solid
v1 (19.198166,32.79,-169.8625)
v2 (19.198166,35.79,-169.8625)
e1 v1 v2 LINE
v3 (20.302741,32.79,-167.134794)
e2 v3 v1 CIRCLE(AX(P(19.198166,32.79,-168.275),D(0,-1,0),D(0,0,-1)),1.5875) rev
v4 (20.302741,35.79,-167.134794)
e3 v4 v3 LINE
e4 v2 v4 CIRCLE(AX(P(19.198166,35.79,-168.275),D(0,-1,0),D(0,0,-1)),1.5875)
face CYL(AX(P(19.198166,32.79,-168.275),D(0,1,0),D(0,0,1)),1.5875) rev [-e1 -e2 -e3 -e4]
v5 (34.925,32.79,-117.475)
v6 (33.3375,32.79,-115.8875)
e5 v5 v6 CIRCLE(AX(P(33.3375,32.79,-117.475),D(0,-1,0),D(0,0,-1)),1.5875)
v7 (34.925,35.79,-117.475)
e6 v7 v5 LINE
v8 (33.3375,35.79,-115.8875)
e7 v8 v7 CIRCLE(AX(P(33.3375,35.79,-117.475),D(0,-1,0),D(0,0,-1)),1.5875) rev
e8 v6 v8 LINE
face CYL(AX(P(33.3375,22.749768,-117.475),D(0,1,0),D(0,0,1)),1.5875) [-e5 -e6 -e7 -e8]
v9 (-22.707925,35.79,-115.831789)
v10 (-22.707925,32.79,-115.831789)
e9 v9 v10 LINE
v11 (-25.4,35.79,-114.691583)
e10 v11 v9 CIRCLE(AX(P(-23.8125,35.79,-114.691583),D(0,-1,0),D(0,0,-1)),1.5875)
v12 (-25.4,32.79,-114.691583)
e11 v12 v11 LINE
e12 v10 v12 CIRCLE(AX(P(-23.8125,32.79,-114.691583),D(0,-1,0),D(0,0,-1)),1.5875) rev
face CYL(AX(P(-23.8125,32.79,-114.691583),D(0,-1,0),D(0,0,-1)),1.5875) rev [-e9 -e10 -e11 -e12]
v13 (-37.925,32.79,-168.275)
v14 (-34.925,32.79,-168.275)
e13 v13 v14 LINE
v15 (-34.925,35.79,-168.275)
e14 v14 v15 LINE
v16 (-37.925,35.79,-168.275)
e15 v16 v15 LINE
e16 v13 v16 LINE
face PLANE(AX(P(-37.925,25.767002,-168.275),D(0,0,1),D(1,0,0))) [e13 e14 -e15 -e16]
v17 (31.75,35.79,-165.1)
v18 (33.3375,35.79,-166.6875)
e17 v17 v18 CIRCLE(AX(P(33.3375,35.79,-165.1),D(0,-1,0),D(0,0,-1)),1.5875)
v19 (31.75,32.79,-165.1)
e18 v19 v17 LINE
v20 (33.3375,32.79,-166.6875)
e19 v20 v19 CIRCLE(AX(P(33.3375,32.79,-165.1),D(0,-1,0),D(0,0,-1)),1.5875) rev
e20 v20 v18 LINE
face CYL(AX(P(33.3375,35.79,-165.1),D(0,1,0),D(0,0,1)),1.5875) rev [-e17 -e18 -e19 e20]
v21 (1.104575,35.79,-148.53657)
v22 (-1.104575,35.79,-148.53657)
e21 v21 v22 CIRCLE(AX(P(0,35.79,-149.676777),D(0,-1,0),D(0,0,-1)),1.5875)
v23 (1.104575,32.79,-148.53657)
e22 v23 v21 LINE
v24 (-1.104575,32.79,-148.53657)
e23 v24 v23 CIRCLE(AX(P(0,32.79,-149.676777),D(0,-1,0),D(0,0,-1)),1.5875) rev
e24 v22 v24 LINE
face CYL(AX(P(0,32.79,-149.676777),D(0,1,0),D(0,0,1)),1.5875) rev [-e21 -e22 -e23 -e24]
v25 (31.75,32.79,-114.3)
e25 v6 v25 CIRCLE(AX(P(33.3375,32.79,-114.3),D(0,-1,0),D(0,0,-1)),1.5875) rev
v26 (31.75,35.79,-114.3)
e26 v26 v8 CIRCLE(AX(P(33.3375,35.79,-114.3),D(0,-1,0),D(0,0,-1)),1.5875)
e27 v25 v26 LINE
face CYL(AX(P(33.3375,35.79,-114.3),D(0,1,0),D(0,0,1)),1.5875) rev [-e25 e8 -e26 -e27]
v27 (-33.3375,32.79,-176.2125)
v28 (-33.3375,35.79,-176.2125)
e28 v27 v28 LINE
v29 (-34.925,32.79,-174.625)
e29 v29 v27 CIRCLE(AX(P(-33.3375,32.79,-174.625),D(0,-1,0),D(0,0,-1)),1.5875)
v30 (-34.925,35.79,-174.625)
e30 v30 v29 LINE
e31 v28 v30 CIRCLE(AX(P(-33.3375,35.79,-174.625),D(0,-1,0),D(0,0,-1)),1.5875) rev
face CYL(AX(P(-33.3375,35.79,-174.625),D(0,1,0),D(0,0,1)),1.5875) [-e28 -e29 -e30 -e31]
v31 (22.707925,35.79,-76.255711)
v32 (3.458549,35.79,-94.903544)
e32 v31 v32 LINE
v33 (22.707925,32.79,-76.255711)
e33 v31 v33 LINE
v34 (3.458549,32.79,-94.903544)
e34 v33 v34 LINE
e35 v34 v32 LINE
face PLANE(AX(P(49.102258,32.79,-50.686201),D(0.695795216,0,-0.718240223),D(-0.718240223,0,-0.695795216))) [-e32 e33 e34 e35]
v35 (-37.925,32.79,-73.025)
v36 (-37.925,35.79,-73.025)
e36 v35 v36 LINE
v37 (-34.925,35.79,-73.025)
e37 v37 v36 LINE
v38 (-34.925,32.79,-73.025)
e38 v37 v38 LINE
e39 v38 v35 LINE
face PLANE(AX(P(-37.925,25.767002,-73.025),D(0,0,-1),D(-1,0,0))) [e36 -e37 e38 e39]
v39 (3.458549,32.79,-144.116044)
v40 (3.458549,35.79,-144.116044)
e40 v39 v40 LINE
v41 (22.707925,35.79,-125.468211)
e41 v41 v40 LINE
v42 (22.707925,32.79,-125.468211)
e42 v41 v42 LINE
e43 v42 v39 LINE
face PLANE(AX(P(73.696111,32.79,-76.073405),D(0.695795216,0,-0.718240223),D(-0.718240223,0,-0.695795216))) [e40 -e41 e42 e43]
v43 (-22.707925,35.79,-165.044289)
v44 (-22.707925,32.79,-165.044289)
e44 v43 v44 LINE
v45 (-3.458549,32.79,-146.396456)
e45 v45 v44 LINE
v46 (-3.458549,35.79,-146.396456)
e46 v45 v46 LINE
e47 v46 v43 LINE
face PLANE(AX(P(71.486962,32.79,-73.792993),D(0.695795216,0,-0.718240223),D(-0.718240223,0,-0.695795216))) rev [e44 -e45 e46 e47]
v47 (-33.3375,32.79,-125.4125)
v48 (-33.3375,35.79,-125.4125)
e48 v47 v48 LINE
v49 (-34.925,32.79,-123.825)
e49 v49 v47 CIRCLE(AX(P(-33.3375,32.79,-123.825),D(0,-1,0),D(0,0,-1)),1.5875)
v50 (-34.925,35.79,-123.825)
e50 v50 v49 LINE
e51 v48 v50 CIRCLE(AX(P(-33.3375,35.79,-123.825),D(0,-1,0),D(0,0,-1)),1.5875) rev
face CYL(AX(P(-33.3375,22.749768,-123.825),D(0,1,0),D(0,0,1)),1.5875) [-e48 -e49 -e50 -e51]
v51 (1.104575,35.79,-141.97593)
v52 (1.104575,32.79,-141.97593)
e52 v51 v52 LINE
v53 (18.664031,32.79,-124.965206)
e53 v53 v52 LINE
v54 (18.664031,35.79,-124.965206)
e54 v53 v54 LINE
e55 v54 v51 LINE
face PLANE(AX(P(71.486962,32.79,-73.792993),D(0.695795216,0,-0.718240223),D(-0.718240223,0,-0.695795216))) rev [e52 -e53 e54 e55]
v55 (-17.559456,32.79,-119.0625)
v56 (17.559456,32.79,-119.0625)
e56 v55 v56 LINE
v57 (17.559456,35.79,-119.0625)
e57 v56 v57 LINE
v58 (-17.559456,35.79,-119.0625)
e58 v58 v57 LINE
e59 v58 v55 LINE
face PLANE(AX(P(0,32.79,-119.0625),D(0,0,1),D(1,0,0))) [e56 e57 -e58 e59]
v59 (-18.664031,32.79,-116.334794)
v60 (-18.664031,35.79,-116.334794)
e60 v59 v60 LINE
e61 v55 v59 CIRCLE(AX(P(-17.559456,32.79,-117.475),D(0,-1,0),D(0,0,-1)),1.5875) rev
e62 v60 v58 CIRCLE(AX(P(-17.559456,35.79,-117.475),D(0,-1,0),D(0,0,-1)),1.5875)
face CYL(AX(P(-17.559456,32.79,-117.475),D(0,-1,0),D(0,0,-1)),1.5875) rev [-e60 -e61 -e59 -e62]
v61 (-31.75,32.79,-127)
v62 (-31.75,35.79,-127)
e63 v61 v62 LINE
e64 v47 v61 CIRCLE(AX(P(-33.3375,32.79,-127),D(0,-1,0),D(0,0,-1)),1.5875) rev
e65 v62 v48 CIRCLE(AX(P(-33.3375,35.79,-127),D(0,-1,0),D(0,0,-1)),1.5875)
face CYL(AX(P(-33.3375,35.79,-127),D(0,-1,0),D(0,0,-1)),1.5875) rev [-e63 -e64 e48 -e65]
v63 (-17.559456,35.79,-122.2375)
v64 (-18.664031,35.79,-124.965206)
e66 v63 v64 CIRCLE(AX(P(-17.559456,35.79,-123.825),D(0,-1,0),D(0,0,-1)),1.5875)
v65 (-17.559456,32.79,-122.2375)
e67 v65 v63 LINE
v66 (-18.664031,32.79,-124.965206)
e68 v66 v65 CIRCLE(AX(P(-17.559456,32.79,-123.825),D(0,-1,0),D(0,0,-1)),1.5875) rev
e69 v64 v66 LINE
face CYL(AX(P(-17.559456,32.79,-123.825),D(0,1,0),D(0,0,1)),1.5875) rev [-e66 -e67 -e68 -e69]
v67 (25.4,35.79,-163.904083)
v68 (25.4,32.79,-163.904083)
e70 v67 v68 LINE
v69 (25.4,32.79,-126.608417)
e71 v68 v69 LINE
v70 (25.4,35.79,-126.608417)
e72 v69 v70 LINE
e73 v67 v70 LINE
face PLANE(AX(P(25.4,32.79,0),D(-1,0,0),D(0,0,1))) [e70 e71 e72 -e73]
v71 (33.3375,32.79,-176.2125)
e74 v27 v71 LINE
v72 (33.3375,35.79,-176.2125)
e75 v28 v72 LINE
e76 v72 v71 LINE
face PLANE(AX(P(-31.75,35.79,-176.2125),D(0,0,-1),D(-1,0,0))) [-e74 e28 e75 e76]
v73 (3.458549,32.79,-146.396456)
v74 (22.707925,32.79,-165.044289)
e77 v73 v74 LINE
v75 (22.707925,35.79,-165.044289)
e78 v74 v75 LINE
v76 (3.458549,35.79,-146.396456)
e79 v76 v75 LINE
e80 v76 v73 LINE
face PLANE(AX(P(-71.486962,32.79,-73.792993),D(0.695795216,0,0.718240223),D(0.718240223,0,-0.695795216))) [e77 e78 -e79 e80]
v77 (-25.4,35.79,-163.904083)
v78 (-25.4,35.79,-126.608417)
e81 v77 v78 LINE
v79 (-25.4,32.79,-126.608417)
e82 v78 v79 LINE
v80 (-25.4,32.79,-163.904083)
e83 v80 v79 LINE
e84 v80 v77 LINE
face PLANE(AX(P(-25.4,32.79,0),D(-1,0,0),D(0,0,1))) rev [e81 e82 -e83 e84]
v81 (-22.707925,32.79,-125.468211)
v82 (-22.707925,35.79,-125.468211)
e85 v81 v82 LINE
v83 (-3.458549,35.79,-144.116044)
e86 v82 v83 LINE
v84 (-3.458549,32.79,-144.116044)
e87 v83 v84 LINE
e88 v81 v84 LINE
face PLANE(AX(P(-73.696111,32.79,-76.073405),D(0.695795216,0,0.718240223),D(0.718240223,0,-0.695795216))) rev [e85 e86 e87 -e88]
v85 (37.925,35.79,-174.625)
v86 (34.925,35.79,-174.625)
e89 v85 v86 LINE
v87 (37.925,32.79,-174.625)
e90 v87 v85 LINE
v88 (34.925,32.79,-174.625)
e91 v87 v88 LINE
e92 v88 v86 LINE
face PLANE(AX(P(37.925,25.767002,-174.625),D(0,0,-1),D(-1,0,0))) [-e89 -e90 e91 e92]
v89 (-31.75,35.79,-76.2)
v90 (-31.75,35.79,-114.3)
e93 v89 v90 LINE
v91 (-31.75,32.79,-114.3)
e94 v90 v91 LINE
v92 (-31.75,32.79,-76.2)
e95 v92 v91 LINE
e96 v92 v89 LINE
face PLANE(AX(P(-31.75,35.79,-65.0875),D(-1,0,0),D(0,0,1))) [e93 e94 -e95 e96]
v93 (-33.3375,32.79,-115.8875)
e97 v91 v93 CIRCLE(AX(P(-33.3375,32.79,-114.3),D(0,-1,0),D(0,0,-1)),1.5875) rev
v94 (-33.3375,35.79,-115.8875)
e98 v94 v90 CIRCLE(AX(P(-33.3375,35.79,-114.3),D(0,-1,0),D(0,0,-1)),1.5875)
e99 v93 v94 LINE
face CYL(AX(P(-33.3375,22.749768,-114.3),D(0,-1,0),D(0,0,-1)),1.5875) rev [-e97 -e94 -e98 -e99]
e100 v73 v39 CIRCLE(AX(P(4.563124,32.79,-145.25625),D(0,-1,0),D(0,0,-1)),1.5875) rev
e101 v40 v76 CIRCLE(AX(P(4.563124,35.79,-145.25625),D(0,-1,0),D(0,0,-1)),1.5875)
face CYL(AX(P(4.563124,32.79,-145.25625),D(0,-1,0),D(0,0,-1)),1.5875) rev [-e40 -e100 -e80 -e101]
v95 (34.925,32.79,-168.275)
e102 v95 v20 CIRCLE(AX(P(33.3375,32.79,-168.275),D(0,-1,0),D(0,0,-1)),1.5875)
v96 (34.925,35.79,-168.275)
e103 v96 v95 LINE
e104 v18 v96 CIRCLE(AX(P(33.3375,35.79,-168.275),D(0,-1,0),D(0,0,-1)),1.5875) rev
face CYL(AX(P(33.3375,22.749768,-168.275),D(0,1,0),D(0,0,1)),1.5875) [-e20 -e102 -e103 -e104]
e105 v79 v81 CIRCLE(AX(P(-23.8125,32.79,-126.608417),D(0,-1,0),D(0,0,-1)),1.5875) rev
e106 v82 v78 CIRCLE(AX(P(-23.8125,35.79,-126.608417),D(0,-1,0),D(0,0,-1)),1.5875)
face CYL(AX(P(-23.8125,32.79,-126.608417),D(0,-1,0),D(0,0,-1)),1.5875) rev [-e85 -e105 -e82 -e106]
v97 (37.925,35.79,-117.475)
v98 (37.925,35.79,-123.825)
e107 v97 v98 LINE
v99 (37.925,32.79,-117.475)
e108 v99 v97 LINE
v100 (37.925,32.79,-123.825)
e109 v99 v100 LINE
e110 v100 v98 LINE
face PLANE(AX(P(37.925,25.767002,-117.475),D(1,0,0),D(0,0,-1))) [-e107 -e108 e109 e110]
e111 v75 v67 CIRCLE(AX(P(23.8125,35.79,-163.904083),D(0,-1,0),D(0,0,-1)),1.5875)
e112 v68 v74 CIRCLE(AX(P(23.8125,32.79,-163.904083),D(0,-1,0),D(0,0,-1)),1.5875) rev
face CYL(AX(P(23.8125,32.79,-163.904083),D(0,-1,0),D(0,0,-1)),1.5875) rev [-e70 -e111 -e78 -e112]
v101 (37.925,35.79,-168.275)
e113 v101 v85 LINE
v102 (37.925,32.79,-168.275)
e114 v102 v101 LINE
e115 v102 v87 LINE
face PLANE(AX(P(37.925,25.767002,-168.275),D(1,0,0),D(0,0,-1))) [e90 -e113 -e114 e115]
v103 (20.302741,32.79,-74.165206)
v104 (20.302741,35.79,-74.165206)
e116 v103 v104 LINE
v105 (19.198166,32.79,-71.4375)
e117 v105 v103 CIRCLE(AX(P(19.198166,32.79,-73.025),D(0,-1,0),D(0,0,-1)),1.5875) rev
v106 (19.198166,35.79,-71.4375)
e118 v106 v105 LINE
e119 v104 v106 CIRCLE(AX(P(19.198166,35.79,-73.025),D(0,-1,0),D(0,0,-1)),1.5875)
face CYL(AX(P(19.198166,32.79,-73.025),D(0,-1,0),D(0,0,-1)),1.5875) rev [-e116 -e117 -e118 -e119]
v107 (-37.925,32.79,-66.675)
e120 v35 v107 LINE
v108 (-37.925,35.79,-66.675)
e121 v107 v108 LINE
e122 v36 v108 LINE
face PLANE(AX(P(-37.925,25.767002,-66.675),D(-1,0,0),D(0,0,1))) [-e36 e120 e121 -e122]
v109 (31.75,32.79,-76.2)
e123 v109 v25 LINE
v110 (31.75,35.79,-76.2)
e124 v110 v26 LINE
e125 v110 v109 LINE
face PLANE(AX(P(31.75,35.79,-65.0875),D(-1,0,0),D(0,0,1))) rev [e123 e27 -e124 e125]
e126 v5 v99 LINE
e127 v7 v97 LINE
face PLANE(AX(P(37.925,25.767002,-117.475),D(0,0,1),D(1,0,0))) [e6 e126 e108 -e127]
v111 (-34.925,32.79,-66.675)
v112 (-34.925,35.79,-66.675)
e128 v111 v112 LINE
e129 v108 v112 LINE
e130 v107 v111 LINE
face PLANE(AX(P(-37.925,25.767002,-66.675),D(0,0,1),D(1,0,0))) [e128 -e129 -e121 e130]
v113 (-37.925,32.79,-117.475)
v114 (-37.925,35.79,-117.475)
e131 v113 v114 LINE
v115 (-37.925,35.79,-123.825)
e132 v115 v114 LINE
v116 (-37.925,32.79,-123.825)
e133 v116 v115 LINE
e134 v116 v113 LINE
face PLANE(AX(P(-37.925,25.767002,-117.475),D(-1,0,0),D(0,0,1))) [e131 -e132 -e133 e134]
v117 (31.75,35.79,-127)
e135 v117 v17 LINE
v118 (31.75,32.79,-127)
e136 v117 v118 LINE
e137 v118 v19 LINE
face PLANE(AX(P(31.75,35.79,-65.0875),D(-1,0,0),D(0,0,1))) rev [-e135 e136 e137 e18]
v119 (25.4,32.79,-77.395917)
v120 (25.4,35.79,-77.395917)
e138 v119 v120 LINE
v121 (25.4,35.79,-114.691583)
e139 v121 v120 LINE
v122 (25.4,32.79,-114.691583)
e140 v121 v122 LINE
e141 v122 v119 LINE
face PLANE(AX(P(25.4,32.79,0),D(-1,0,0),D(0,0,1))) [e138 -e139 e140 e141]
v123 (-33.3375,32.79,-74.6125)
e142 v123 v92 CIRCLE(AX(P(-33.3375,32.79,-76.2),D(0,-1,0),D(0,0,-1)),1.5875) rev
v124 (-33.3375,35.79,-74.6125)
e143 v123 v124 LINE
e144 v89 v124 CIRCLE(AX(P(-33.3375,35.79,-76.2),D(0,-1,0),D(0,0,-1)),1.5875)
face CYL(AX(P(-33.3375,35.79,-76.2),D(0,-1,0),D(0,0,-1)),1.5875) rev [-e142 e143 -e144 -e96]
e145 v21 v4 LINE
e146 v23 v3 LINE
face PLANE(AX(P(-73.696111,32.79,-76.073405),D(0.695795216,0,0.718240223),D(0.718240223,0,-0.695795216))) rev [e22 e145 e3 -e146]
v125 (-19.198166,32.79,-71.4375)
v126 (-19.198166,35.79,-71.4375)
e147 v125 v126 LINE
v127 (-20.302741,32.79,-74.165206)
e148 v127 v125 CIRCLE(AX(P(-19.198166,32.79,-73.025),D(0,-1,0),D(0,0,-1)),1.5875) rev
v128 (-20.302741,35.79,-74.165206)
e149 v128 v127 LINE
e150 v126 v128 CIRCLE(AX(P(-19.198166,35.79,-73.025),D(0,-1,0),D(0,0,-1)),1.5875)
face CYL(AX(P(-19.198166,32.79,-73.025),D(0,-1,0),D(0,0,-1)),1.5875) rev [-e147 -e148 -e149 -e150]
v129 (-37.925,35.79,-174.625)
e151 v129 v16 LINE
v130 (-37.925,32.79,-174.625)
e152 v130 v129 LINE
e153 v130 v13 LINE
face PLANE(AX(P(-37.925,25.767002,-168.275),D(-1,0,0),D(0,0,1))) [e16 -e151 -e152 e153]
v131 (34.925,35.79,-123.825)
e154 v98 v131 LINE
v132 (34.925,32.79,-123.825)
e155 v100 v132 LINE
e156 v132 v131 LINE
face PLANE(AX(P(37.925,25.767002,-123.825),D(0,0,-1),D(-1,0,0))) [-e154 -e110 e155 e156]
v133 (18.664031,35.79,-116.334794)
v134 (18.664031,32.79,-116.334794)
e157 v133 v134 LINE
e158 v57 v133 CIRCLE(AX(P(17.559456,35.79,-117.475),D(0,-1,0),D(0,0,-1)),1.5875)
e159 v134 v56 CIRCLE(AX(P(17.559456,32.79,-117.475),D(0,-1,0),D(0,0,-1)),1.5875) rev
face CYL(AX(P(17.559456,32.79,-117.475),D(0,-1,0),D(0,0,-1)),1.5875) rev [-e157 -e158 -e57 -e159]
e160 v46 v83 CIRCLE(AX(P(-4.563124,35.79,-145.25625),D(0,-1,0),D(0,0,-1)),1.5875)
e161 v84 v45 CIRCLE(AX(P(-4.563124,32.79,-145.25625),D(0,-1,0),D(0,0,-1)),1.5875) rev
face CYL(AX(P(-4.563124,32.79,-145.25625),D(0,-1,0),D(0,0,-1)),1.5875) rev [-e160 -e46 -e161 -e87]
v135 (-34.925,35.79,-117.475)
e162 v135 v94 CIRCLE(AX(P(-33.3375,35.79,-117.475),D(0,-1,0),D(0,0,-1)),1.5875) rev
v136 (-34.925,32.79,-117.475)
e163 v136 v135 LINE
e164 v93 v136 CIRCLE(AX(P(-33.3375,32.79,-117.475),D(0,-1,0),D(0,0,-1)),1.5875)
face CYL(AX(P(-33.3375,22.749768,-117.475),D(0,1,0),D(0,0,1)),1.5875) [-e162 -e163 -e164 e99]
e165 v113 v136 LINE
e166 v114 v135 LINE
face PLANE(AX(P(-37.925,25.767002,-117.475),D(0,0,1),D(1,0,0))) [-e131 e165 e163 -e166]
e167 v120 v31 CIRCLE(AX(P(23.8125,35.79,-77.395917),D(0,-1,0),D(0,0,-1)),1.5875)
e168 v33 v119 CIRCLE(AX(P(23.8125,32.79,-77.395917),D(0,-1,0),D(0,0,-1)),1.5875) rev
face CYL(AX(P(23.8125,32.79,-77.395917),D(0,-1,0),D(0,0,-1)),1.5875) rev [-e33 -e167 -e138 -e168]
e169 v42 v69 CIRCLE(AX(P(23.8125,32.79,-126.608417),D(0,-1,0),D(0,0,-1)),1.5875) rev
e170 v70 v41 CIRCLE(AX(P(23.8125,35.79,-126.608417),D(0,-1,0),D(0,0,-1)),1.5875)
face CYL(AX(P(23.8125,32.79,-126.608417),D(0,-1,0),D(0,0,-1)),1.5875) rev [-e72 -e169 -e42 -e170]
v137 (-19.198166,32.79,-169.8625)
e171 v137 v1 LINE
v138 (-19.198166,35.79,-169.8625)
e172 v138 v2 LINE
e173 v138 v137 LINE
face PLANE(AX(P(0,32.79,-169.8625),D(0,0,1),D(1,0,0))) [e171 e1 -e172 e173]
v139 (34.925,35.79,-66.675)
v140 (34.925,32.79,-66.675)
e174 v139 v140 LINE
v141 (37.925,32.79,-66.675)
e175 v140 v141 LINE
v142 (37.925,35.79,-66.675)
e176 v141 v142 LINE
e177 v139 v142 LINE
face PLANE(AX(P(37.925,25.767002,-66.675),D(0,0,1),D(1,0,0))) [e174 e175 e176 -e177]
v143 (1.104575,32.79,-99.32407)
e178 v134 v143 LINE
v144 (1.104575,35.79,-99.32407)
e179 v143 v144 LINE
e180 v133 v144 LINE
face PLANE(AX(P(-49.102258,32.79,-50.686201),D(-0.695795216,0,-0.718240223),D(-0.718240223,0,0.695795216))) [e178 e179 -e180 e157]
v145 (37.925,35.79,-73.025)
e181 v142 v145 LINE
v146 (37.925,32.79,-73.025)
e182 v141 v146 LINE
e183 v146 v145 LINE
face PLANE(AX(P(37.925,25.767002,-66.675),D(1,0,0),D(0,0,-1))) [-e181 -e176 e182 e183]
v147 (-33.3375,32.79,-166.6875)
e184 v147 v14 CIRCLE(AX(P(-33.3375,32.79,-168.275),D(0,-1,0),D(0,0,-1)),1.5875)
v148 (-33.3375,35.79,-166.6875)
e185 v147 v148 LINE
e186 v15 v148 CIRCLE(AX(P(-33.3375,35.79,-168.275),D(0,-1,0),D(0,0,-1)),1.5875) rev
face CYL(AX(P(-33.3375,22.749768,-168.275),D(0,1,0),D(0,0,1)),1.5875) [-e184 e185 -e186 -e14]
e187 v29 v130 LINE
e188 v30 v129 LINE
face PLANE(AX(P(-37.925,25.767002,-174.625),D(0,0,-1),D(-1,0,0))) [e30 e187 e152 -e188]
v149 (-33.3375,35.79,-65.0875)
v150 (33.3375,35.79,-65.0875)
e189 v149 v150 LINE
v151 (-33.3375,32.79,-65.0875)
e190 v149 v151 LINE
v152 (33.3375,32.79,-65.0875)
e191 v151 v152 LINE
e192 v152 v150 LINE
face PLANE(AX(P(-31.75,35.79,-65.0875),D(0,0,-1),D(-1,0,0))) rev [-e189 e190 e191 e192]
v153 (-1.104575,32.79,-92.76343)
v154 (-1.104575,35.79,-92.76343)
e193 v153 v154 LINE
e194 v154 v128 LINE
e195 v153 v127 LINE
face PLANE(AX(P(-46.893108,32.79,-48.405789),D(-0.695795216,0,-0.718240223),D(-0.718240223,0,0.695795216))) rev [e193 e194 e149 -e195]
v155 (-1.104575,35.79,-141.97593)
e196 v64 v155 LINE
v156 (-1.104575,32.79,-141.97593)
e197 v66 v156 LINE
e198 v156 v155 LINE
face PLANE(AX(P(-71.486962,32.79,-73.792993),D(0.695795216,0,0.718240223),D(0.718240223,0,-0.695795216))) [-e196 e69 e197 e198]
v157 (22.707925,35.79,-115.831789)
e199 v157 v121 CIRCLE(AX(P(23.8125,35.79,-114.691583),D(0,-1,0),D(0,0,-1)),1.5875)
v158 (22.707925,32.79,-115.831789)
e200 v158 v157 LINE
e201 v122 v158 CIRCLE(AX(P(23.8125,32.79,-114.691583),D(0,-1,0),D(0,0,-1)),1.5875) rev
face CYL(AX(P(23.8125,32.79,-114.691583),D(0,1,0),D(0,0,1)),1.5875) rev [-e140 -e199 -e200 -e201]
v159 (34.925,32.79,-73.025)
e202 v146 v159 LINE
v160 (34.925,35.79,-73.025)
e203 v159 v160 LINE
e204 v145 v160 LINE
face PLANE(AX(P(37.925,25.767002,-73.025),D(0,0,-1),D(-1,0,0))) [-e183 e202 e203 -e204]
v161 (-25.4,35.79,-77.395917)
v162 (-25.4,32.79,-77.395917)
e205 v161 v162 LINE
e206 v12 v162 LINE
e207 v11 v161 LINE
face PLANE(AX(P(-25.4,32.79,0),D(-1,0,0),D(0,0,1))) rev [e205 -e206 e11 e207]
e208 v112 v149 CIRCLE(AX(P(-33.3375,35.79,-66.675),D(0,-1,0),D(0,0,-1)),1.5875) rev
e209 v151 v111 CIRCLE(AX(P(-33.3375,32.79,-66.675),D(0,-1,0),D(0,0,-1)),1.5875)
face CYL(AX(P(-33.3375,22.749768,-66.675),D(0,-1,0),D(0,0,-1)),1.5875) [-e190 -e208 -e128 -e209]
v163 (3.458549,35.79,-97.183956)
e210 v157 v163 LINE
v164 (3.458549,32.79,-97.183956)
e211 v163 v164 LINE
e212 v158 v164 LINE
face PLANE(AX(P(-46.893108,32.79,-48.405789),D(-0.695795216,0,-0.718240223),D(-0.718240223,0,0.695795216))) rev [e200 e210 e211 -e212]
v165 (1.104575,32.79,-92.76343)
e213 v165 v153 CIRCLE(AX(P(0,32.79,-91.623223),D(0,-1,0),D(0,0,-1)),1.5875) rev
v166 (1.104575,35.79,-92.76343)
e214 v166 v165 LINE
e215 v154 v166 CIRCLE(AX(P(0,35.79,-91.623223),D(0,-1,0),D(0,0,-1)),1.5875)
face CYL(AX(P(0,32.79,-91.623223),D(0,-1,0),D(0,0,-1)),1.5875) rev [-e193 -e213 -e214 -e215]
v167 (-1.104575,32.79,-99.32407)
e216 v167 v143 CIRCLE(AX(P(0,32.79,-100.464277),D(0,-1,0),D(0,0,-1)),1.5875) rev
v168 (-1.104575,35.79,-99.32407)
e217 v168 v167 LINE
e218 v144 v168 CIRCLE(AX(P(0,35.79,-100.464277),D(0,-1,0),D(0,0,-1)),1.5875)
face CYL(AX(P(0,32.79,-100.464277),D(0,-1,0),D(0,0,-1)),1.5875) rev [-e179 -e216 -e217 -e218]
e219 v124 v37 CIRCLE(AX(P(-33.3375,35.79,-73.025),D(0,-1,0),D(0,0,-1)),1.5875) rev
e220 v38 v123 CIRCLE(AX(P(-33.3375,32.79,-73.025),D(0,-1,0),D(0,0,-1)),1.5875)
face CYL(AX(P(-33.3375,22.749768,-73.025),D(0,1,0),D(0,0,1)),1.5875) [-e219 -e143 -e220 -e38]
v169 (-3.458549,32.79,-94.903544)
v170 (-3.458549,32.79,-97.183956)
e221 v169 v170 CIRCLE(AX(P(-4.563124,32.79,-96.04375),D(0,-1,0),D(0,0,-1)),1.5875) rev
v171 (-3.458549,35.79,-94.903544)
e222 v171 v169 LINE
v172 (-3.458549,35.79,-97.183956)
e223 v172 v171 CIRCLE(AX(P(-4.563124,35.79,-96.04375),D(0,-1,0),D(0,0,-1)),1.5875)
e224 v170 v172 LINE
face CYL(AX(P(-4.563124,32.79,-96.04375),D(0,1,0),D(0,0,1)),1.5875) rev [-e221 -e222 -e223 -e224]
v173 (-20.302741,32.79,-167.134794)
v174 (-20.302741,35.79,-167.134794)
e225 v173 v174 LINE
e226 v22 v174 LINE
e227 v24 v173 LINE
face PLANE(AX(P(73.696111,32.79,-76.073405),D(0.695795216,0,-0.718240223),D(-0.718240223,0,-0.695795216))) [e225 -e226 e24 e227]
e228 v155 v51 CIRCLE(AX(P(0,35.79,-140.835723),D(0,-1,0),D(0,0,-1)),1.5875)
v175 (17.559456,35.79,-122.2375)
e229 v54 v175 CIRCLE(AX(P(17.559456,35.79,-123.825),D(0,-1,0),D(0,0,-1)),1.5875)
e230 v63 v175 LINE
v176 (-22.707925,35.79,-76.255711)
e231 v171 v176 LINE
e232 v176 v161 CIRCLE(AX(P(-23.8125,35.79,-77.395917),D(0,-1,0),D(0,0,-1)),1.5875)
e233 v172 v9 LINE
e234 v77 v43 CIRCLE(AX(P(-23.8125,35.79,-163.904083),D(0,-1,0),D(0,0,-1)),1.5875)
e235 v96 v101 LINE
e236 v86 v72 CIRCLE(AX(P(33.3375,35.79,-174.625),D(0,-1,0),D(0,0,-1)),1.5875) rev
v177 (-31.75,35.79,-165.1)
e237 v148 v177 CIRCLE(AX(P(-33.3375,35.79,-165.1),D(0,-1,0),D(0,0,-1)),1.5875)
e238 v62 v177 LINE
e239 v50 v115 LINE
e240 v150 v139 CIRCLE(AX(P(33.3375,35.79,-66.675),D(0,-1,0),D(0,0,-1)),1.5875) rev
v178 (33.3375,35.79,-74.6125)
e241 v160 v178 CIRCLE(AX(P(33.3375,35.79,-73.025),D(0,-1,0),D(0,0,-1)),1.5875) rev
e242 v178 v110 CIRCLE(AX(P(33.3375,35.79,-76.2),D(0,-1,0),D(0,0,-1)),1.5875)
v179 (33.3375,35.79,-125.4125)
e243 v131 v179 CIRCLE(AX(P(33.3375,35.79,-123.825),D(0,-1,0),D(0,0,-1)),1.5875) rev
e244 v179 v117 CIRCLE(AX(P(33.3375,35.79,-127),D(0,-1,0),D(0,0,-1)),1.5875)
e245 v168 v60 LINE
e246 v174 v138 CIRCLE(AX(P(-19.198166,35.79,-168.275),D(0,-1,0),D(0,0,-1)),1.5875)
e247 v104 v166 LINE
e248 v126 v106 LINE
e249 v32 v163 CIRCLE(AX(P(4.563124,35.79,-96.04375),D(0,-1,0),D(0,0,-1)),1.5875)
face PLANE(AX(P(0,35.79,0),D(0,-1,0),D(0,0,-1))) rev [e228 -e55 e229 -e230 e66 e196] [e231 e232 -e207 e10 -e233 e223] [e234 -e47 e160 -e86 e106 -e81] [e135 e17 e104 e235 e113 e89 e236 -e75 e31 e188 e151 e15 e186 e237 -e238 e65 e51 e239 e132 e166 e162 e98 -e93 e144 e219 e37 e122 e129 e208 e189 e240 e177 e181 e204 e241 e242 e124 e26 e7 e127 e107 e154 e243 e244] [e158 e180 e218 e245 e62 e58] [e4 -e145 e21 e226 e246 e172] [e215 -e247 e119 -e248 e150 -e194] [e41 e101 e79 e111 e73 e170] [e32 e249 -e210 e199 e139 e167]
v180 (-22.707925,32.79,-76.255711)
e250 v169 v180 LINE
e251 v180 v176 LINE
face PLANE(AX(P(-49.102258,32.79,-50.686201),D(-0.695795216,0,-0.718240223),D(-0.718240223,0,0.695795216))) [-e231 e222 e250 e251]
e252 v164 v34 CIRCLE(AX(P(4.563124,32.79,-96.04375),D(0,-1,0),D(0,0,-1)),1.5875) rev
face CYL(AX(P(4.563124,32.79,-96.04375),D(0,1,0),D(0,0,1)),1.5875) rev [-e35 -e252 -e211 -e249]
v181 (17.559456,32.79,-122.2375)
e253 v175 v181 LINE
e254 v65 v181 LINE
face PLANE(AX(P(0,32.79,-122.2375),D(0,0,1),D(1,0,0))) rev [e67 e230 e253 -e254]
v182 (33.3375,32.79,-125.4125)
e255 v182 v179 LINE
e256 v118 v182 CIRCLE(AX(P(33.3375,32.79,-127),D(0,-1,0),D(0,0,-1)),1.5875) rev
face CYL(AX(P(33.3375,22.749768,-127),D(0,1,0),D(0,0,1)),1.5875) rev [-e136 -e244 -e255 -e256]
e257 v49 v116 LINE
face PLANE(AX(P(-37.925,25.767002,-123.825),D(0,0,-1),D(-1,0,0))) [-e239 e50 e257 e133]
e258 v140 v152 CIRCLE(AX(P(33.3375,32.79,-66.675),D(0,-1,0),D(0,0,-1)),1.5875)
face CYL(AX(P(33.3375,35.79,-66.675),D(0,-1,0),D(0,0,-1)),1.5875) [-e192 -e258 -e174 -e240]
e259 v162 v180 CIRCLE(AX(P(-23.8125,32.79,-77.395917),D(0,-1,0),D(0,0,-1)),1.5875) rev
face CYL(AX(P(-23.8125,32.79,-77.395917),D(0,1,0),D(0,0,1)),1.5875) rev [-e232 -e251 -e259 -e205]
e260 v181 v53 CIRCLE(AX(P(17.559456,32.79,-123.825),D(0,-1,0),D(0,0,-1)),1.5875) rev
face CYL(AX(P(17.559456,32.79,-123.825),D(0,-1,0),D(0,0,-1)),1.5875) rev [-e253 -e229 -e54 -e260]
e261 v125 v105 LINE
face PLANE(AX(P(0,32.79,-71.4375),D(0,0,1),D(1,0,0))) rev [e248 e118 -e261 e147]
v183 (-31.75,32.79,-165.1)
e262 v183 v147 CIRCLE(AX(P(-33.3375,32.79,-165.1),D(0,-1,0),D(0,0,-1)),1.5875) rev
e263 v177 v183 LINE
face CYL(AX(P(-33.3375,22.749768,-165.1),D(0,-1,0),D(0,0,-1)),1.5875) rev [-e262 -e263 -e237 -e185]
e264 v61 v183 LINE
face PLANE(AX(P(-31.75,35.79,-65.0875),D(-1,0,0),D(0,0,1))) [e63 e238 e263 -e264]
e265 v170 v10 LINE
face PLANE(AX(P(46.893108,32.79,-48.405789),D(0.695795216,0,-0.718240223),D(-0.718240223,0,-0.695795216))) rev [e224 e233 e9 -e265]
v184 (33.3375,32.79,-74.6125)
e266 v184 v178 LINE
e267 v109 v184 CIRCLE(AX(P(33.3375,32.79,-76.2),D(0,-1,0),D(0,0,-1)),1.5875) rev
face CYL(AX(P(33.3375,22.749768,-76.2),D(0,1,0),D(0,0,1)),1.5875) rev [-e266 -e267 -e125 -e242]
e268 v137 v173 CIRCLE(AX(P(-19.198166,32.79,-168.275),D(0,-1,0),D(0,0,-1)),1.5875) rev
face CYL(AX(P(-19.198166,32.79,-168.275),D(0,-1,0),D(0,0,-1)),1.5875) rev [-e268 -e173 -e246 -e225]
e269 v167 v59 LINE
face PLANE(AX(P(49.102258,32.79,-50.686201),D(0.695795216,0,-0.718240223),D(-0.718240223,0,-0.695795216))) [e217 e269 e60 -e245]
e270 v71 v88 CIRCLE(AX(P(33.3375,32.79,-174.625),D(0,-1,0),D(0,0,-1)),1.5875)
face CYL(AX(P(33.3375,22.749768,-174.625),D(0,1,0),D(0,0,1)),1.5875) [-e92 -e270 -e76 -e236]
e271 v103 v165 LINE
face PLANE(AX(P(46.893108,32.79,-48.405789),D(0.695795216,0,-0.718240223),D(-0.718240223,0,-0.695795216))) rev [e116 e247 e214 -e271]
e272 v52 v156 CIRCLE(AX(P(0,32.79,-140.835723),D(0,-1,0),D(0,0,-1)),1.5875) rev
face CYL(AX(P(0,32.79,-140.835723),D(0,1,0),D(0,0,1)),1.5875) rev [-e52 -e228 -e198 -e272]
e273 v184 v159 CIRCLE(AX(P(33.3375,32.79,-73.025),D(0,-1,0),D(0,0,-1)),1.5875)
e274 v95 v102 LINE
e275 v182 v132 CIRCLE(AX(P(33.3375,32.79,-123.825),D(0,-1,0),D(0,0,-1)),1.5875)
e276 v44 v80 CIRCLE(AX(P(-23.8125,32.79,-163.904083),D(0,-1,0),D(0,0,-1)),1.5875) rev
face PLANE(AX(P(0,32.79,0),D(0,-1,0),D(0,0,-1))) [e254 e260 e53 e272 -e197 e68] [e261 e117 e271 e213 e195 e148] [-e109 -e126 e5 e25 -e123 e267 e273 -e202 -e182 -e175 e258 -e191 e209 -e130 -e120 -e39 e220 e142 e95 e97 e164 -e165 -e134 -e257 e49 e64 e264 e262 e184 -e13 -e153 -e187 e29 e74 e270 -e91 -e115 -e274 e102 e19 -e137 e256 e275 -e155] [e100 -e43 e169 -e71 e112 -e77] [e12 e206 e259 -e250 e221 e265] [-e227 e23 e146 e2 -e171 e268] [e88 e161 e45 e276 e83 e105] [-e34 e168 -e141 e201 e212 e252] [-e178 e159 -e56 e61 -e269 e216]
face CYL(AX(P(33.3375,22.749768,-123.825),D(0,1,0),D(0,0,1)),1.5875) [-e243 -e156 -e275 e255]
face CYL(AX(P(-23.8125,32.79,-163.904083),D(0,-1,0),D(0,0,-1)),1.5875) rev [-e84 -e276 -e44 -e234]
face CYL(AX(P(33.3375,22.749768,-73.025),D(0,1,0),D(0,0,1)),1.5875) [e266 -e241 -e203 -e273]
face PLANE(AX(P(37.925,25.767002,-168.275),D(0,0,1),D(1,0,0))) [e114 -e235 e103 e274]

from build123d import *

# Parameters (mm, degrees)
SKETCH1_W           = 63.5
SKETCH1_H           = 111.125
BOSS_EXTRUDE1_DEPTH = 1.5
SKETCH2_W           = 3.175
SKETCH2_H           = 9.525
BOSS_EXTRUDE2_DEPTH = 3
CUT_EXTRUDE1_DEPTH  = 3
FILLET1_R           = 1.5875
SKETCH5_W           = 3
SKETCH5_H           = 6.35
BOSS_EXTRUDE3_DEPTH = 3


with BuildPart() as part:
    # Sketch1 → Boss-Extrude1 (new, symmetric)
    with BuildSketch(Plane(origin=(0, 34.29, 0), x_dir=(1, 0, 0), z_dir=(0, 1, 0))):
        with Locations((0, 120.65)):
            Rectangle(SKETCH1_W, SKETCH1_H)
    extrude(amount=BOSS_EXTRUDE1_DEPTH, both=True)

    # Sketch2 → Boss-Extrude2 (add)
    with BuildSketch(Plane(origin=(0, 35.79, 0), x_dir=(1, 0, 0), z_dir=(0, 1, 0))):
        with Locations((33.3375, 171.45)):
            Rectangle(SKETCH2_W, SKETCH2_H)
        with Locations((-33.3375, 171.45)):
            Rectangle(SKETCH2_W, SKETCH2_H)
        with Locations((33.3375, 120.65)):
            Rectangle(SKETCH2_W, SKETCH2_H)
        with Locations((-33.3375, 120.65)):
            Rectangle(SKETCH2_W, SKETCH2_H)
        with Locations((33.3375, 69.85)):
            Rectangle(SKETCH2_W, SKETCH2_H)
        with Locations((-33.3375, 69.85)):
            Rectangle(SKETCH2_W, SKETCH2_H)
    extrude(amount=-BOSS_EXTRUDE2_DEPTH)

    # Sketch4 → Cut-Extrude1 (cut)
    with BuildSketch(Plane(origin=(0, 35.79, 0), x_dir=(1, 0, 0), z_dir=(0, 1, 0))):
        Polygon((23.118437891, 169.8625), (-23.118437891, 169.8625), (0, 147.466513293), align=None)
        Polygon((-2.281562109, 145.25625), (-25.4, 167.652236707), (-25.4, 122.860263293), align=None)
        Polygon((25.4, 167.652236707), (2.281562109, 145.25625), (25.4, 122.860263293), align=None)
        Polygon((21.479728214, 122.2375), (0, 143.045986707), (-21.479728214, 122.2375), align=None)
        Polygon((-2.281562109, 96.04375), (-25.4, 118.439736707), (-25.4, 73.647763293), align=None)
        Polygon((21.479728214, 119.0625), (-21.479728214, 119.0625), (0, 98.254013293), align=None)
        Polygon((25.4, 73.647763293), (25.4, 118.439736707), (2.281562109, 96.04375), align=None)
        Polygon((23.118437891, 71.4375), (0, 93.833486707), (-23.118437891, 71.4375), align=None)
    extrude(amount=-CUT_EXTRUDE1_DEPTH, mode=Mode.SUBTRACT)

    # Fillet1
    fillet1_edges = [part.edges().sort_by_distance(p)[0] for p in [
        (-21.479728214, 34.29, -119.0625),
        (21.479728214, 34.29, -119.0625),
        (0, 34.29, -98.254013293),
        (-25.4, 34.29, -118.439736707),
        (-2.281562109, 34.29, -96.04375),
        (-25.4, 34.29, -73.647763293),
        (25.4, 34.29, -167.652236707),
        (25.4, 34.29, -122.860263293),
        (2.281562109, 34.29, -145.25625),
        (23.118437891, 34.29, -169.8625),
        (0, 34.29, -147.466513293),
        (-23.118437891, 34.29, -169.8625),
        (2.281562109, 34.29, -96.04375),
        (25.4, 34.29, -118.439736707),
        (25.4, 34.29, -73.647763293),
        (34.925, 34.29, -65.0875),
        (34.925, 34.29, -74.6125),
        (31.75, 34.29, -74.6125),
        (31.75, 34.29, -115.8875),
        (34.925, 34.29, -115.8875),
        (34.925, 34.29, -125.4125),
        (31.75, 34.29, -125.4125),
        (31.75, 34.29, -166.6875),
        (34.925, 34.29, -166.6875),
        (34.925, 34.29, -176.2125),
        (-34.925, 34.29, -166.6875),
        (-31.75, 34.29, -166.6875),
        (-31.75, 34.29, -125.4125),
        (-34.925, 34.29, -125.4125),
        (-34.925, 34.29, -115.8875),
        (-31.75, 34.29, -115.8875),
        (-31.75, 34.29, -74.6125),
        (-34.925, 34.29, -74.6125),
        (-34.925, 34.29, -65.0875),
        (-25.4, 34.29, -122.860263293),
        (-25.4, 34.29, -167.652236707),
        (-2.281562109, 34.29, -145.25625),
        (-23.118437891, 34.29, -71.4375),
        (0, 34.29, -93.833486707),
        (23.118437891, 34.29, -71.4375),
        (-21.479728214, 34.29, -122.2375),
        (0, 34.29, -143.045986707),
        (21.479728214, 34.29, -122.2375),
        (-34.925, 34.29, -176.2125),
    ]]
    fillet(fillet1_edges, radius=FILLET1_R - 0.0001)  # a hair under: the kernel refuses the full size

    # Sketch5 → Boss-Extrude3 (add)
    with BuildSketch(Plane(origin=(0, 35.79, 0), x_dir=(1, 0, 0), z_dir=(0, 1, 0))):
        with Locations((36.425, 171.45)):
            Rectangle(SKETCH5_W, SKETCH5_H)
        with Locations((-36.425, 171.45)):
            Rectangle(SKETCH5_W, SKETCH5_H)
        with Locations((36.425, 120.65)):
            Rectangle(SKETCH5_W, SKETCH5_H)
        with Locations((-36.425, 120.65)):
            Rectangle(SKETCH5_W, SKETCH5_H)
        with Locations((36.425, 69.85)):
            Rectangle(SKETCH5_W, SKETCH5_H)
        with Locations((-36.425, 69.85)):
            Rectangle(SKETCH5_W, SKETCH5_H)
    extrude(amount=-BOSS_EXTRUDE3_DEPTH)


solid = part.part
